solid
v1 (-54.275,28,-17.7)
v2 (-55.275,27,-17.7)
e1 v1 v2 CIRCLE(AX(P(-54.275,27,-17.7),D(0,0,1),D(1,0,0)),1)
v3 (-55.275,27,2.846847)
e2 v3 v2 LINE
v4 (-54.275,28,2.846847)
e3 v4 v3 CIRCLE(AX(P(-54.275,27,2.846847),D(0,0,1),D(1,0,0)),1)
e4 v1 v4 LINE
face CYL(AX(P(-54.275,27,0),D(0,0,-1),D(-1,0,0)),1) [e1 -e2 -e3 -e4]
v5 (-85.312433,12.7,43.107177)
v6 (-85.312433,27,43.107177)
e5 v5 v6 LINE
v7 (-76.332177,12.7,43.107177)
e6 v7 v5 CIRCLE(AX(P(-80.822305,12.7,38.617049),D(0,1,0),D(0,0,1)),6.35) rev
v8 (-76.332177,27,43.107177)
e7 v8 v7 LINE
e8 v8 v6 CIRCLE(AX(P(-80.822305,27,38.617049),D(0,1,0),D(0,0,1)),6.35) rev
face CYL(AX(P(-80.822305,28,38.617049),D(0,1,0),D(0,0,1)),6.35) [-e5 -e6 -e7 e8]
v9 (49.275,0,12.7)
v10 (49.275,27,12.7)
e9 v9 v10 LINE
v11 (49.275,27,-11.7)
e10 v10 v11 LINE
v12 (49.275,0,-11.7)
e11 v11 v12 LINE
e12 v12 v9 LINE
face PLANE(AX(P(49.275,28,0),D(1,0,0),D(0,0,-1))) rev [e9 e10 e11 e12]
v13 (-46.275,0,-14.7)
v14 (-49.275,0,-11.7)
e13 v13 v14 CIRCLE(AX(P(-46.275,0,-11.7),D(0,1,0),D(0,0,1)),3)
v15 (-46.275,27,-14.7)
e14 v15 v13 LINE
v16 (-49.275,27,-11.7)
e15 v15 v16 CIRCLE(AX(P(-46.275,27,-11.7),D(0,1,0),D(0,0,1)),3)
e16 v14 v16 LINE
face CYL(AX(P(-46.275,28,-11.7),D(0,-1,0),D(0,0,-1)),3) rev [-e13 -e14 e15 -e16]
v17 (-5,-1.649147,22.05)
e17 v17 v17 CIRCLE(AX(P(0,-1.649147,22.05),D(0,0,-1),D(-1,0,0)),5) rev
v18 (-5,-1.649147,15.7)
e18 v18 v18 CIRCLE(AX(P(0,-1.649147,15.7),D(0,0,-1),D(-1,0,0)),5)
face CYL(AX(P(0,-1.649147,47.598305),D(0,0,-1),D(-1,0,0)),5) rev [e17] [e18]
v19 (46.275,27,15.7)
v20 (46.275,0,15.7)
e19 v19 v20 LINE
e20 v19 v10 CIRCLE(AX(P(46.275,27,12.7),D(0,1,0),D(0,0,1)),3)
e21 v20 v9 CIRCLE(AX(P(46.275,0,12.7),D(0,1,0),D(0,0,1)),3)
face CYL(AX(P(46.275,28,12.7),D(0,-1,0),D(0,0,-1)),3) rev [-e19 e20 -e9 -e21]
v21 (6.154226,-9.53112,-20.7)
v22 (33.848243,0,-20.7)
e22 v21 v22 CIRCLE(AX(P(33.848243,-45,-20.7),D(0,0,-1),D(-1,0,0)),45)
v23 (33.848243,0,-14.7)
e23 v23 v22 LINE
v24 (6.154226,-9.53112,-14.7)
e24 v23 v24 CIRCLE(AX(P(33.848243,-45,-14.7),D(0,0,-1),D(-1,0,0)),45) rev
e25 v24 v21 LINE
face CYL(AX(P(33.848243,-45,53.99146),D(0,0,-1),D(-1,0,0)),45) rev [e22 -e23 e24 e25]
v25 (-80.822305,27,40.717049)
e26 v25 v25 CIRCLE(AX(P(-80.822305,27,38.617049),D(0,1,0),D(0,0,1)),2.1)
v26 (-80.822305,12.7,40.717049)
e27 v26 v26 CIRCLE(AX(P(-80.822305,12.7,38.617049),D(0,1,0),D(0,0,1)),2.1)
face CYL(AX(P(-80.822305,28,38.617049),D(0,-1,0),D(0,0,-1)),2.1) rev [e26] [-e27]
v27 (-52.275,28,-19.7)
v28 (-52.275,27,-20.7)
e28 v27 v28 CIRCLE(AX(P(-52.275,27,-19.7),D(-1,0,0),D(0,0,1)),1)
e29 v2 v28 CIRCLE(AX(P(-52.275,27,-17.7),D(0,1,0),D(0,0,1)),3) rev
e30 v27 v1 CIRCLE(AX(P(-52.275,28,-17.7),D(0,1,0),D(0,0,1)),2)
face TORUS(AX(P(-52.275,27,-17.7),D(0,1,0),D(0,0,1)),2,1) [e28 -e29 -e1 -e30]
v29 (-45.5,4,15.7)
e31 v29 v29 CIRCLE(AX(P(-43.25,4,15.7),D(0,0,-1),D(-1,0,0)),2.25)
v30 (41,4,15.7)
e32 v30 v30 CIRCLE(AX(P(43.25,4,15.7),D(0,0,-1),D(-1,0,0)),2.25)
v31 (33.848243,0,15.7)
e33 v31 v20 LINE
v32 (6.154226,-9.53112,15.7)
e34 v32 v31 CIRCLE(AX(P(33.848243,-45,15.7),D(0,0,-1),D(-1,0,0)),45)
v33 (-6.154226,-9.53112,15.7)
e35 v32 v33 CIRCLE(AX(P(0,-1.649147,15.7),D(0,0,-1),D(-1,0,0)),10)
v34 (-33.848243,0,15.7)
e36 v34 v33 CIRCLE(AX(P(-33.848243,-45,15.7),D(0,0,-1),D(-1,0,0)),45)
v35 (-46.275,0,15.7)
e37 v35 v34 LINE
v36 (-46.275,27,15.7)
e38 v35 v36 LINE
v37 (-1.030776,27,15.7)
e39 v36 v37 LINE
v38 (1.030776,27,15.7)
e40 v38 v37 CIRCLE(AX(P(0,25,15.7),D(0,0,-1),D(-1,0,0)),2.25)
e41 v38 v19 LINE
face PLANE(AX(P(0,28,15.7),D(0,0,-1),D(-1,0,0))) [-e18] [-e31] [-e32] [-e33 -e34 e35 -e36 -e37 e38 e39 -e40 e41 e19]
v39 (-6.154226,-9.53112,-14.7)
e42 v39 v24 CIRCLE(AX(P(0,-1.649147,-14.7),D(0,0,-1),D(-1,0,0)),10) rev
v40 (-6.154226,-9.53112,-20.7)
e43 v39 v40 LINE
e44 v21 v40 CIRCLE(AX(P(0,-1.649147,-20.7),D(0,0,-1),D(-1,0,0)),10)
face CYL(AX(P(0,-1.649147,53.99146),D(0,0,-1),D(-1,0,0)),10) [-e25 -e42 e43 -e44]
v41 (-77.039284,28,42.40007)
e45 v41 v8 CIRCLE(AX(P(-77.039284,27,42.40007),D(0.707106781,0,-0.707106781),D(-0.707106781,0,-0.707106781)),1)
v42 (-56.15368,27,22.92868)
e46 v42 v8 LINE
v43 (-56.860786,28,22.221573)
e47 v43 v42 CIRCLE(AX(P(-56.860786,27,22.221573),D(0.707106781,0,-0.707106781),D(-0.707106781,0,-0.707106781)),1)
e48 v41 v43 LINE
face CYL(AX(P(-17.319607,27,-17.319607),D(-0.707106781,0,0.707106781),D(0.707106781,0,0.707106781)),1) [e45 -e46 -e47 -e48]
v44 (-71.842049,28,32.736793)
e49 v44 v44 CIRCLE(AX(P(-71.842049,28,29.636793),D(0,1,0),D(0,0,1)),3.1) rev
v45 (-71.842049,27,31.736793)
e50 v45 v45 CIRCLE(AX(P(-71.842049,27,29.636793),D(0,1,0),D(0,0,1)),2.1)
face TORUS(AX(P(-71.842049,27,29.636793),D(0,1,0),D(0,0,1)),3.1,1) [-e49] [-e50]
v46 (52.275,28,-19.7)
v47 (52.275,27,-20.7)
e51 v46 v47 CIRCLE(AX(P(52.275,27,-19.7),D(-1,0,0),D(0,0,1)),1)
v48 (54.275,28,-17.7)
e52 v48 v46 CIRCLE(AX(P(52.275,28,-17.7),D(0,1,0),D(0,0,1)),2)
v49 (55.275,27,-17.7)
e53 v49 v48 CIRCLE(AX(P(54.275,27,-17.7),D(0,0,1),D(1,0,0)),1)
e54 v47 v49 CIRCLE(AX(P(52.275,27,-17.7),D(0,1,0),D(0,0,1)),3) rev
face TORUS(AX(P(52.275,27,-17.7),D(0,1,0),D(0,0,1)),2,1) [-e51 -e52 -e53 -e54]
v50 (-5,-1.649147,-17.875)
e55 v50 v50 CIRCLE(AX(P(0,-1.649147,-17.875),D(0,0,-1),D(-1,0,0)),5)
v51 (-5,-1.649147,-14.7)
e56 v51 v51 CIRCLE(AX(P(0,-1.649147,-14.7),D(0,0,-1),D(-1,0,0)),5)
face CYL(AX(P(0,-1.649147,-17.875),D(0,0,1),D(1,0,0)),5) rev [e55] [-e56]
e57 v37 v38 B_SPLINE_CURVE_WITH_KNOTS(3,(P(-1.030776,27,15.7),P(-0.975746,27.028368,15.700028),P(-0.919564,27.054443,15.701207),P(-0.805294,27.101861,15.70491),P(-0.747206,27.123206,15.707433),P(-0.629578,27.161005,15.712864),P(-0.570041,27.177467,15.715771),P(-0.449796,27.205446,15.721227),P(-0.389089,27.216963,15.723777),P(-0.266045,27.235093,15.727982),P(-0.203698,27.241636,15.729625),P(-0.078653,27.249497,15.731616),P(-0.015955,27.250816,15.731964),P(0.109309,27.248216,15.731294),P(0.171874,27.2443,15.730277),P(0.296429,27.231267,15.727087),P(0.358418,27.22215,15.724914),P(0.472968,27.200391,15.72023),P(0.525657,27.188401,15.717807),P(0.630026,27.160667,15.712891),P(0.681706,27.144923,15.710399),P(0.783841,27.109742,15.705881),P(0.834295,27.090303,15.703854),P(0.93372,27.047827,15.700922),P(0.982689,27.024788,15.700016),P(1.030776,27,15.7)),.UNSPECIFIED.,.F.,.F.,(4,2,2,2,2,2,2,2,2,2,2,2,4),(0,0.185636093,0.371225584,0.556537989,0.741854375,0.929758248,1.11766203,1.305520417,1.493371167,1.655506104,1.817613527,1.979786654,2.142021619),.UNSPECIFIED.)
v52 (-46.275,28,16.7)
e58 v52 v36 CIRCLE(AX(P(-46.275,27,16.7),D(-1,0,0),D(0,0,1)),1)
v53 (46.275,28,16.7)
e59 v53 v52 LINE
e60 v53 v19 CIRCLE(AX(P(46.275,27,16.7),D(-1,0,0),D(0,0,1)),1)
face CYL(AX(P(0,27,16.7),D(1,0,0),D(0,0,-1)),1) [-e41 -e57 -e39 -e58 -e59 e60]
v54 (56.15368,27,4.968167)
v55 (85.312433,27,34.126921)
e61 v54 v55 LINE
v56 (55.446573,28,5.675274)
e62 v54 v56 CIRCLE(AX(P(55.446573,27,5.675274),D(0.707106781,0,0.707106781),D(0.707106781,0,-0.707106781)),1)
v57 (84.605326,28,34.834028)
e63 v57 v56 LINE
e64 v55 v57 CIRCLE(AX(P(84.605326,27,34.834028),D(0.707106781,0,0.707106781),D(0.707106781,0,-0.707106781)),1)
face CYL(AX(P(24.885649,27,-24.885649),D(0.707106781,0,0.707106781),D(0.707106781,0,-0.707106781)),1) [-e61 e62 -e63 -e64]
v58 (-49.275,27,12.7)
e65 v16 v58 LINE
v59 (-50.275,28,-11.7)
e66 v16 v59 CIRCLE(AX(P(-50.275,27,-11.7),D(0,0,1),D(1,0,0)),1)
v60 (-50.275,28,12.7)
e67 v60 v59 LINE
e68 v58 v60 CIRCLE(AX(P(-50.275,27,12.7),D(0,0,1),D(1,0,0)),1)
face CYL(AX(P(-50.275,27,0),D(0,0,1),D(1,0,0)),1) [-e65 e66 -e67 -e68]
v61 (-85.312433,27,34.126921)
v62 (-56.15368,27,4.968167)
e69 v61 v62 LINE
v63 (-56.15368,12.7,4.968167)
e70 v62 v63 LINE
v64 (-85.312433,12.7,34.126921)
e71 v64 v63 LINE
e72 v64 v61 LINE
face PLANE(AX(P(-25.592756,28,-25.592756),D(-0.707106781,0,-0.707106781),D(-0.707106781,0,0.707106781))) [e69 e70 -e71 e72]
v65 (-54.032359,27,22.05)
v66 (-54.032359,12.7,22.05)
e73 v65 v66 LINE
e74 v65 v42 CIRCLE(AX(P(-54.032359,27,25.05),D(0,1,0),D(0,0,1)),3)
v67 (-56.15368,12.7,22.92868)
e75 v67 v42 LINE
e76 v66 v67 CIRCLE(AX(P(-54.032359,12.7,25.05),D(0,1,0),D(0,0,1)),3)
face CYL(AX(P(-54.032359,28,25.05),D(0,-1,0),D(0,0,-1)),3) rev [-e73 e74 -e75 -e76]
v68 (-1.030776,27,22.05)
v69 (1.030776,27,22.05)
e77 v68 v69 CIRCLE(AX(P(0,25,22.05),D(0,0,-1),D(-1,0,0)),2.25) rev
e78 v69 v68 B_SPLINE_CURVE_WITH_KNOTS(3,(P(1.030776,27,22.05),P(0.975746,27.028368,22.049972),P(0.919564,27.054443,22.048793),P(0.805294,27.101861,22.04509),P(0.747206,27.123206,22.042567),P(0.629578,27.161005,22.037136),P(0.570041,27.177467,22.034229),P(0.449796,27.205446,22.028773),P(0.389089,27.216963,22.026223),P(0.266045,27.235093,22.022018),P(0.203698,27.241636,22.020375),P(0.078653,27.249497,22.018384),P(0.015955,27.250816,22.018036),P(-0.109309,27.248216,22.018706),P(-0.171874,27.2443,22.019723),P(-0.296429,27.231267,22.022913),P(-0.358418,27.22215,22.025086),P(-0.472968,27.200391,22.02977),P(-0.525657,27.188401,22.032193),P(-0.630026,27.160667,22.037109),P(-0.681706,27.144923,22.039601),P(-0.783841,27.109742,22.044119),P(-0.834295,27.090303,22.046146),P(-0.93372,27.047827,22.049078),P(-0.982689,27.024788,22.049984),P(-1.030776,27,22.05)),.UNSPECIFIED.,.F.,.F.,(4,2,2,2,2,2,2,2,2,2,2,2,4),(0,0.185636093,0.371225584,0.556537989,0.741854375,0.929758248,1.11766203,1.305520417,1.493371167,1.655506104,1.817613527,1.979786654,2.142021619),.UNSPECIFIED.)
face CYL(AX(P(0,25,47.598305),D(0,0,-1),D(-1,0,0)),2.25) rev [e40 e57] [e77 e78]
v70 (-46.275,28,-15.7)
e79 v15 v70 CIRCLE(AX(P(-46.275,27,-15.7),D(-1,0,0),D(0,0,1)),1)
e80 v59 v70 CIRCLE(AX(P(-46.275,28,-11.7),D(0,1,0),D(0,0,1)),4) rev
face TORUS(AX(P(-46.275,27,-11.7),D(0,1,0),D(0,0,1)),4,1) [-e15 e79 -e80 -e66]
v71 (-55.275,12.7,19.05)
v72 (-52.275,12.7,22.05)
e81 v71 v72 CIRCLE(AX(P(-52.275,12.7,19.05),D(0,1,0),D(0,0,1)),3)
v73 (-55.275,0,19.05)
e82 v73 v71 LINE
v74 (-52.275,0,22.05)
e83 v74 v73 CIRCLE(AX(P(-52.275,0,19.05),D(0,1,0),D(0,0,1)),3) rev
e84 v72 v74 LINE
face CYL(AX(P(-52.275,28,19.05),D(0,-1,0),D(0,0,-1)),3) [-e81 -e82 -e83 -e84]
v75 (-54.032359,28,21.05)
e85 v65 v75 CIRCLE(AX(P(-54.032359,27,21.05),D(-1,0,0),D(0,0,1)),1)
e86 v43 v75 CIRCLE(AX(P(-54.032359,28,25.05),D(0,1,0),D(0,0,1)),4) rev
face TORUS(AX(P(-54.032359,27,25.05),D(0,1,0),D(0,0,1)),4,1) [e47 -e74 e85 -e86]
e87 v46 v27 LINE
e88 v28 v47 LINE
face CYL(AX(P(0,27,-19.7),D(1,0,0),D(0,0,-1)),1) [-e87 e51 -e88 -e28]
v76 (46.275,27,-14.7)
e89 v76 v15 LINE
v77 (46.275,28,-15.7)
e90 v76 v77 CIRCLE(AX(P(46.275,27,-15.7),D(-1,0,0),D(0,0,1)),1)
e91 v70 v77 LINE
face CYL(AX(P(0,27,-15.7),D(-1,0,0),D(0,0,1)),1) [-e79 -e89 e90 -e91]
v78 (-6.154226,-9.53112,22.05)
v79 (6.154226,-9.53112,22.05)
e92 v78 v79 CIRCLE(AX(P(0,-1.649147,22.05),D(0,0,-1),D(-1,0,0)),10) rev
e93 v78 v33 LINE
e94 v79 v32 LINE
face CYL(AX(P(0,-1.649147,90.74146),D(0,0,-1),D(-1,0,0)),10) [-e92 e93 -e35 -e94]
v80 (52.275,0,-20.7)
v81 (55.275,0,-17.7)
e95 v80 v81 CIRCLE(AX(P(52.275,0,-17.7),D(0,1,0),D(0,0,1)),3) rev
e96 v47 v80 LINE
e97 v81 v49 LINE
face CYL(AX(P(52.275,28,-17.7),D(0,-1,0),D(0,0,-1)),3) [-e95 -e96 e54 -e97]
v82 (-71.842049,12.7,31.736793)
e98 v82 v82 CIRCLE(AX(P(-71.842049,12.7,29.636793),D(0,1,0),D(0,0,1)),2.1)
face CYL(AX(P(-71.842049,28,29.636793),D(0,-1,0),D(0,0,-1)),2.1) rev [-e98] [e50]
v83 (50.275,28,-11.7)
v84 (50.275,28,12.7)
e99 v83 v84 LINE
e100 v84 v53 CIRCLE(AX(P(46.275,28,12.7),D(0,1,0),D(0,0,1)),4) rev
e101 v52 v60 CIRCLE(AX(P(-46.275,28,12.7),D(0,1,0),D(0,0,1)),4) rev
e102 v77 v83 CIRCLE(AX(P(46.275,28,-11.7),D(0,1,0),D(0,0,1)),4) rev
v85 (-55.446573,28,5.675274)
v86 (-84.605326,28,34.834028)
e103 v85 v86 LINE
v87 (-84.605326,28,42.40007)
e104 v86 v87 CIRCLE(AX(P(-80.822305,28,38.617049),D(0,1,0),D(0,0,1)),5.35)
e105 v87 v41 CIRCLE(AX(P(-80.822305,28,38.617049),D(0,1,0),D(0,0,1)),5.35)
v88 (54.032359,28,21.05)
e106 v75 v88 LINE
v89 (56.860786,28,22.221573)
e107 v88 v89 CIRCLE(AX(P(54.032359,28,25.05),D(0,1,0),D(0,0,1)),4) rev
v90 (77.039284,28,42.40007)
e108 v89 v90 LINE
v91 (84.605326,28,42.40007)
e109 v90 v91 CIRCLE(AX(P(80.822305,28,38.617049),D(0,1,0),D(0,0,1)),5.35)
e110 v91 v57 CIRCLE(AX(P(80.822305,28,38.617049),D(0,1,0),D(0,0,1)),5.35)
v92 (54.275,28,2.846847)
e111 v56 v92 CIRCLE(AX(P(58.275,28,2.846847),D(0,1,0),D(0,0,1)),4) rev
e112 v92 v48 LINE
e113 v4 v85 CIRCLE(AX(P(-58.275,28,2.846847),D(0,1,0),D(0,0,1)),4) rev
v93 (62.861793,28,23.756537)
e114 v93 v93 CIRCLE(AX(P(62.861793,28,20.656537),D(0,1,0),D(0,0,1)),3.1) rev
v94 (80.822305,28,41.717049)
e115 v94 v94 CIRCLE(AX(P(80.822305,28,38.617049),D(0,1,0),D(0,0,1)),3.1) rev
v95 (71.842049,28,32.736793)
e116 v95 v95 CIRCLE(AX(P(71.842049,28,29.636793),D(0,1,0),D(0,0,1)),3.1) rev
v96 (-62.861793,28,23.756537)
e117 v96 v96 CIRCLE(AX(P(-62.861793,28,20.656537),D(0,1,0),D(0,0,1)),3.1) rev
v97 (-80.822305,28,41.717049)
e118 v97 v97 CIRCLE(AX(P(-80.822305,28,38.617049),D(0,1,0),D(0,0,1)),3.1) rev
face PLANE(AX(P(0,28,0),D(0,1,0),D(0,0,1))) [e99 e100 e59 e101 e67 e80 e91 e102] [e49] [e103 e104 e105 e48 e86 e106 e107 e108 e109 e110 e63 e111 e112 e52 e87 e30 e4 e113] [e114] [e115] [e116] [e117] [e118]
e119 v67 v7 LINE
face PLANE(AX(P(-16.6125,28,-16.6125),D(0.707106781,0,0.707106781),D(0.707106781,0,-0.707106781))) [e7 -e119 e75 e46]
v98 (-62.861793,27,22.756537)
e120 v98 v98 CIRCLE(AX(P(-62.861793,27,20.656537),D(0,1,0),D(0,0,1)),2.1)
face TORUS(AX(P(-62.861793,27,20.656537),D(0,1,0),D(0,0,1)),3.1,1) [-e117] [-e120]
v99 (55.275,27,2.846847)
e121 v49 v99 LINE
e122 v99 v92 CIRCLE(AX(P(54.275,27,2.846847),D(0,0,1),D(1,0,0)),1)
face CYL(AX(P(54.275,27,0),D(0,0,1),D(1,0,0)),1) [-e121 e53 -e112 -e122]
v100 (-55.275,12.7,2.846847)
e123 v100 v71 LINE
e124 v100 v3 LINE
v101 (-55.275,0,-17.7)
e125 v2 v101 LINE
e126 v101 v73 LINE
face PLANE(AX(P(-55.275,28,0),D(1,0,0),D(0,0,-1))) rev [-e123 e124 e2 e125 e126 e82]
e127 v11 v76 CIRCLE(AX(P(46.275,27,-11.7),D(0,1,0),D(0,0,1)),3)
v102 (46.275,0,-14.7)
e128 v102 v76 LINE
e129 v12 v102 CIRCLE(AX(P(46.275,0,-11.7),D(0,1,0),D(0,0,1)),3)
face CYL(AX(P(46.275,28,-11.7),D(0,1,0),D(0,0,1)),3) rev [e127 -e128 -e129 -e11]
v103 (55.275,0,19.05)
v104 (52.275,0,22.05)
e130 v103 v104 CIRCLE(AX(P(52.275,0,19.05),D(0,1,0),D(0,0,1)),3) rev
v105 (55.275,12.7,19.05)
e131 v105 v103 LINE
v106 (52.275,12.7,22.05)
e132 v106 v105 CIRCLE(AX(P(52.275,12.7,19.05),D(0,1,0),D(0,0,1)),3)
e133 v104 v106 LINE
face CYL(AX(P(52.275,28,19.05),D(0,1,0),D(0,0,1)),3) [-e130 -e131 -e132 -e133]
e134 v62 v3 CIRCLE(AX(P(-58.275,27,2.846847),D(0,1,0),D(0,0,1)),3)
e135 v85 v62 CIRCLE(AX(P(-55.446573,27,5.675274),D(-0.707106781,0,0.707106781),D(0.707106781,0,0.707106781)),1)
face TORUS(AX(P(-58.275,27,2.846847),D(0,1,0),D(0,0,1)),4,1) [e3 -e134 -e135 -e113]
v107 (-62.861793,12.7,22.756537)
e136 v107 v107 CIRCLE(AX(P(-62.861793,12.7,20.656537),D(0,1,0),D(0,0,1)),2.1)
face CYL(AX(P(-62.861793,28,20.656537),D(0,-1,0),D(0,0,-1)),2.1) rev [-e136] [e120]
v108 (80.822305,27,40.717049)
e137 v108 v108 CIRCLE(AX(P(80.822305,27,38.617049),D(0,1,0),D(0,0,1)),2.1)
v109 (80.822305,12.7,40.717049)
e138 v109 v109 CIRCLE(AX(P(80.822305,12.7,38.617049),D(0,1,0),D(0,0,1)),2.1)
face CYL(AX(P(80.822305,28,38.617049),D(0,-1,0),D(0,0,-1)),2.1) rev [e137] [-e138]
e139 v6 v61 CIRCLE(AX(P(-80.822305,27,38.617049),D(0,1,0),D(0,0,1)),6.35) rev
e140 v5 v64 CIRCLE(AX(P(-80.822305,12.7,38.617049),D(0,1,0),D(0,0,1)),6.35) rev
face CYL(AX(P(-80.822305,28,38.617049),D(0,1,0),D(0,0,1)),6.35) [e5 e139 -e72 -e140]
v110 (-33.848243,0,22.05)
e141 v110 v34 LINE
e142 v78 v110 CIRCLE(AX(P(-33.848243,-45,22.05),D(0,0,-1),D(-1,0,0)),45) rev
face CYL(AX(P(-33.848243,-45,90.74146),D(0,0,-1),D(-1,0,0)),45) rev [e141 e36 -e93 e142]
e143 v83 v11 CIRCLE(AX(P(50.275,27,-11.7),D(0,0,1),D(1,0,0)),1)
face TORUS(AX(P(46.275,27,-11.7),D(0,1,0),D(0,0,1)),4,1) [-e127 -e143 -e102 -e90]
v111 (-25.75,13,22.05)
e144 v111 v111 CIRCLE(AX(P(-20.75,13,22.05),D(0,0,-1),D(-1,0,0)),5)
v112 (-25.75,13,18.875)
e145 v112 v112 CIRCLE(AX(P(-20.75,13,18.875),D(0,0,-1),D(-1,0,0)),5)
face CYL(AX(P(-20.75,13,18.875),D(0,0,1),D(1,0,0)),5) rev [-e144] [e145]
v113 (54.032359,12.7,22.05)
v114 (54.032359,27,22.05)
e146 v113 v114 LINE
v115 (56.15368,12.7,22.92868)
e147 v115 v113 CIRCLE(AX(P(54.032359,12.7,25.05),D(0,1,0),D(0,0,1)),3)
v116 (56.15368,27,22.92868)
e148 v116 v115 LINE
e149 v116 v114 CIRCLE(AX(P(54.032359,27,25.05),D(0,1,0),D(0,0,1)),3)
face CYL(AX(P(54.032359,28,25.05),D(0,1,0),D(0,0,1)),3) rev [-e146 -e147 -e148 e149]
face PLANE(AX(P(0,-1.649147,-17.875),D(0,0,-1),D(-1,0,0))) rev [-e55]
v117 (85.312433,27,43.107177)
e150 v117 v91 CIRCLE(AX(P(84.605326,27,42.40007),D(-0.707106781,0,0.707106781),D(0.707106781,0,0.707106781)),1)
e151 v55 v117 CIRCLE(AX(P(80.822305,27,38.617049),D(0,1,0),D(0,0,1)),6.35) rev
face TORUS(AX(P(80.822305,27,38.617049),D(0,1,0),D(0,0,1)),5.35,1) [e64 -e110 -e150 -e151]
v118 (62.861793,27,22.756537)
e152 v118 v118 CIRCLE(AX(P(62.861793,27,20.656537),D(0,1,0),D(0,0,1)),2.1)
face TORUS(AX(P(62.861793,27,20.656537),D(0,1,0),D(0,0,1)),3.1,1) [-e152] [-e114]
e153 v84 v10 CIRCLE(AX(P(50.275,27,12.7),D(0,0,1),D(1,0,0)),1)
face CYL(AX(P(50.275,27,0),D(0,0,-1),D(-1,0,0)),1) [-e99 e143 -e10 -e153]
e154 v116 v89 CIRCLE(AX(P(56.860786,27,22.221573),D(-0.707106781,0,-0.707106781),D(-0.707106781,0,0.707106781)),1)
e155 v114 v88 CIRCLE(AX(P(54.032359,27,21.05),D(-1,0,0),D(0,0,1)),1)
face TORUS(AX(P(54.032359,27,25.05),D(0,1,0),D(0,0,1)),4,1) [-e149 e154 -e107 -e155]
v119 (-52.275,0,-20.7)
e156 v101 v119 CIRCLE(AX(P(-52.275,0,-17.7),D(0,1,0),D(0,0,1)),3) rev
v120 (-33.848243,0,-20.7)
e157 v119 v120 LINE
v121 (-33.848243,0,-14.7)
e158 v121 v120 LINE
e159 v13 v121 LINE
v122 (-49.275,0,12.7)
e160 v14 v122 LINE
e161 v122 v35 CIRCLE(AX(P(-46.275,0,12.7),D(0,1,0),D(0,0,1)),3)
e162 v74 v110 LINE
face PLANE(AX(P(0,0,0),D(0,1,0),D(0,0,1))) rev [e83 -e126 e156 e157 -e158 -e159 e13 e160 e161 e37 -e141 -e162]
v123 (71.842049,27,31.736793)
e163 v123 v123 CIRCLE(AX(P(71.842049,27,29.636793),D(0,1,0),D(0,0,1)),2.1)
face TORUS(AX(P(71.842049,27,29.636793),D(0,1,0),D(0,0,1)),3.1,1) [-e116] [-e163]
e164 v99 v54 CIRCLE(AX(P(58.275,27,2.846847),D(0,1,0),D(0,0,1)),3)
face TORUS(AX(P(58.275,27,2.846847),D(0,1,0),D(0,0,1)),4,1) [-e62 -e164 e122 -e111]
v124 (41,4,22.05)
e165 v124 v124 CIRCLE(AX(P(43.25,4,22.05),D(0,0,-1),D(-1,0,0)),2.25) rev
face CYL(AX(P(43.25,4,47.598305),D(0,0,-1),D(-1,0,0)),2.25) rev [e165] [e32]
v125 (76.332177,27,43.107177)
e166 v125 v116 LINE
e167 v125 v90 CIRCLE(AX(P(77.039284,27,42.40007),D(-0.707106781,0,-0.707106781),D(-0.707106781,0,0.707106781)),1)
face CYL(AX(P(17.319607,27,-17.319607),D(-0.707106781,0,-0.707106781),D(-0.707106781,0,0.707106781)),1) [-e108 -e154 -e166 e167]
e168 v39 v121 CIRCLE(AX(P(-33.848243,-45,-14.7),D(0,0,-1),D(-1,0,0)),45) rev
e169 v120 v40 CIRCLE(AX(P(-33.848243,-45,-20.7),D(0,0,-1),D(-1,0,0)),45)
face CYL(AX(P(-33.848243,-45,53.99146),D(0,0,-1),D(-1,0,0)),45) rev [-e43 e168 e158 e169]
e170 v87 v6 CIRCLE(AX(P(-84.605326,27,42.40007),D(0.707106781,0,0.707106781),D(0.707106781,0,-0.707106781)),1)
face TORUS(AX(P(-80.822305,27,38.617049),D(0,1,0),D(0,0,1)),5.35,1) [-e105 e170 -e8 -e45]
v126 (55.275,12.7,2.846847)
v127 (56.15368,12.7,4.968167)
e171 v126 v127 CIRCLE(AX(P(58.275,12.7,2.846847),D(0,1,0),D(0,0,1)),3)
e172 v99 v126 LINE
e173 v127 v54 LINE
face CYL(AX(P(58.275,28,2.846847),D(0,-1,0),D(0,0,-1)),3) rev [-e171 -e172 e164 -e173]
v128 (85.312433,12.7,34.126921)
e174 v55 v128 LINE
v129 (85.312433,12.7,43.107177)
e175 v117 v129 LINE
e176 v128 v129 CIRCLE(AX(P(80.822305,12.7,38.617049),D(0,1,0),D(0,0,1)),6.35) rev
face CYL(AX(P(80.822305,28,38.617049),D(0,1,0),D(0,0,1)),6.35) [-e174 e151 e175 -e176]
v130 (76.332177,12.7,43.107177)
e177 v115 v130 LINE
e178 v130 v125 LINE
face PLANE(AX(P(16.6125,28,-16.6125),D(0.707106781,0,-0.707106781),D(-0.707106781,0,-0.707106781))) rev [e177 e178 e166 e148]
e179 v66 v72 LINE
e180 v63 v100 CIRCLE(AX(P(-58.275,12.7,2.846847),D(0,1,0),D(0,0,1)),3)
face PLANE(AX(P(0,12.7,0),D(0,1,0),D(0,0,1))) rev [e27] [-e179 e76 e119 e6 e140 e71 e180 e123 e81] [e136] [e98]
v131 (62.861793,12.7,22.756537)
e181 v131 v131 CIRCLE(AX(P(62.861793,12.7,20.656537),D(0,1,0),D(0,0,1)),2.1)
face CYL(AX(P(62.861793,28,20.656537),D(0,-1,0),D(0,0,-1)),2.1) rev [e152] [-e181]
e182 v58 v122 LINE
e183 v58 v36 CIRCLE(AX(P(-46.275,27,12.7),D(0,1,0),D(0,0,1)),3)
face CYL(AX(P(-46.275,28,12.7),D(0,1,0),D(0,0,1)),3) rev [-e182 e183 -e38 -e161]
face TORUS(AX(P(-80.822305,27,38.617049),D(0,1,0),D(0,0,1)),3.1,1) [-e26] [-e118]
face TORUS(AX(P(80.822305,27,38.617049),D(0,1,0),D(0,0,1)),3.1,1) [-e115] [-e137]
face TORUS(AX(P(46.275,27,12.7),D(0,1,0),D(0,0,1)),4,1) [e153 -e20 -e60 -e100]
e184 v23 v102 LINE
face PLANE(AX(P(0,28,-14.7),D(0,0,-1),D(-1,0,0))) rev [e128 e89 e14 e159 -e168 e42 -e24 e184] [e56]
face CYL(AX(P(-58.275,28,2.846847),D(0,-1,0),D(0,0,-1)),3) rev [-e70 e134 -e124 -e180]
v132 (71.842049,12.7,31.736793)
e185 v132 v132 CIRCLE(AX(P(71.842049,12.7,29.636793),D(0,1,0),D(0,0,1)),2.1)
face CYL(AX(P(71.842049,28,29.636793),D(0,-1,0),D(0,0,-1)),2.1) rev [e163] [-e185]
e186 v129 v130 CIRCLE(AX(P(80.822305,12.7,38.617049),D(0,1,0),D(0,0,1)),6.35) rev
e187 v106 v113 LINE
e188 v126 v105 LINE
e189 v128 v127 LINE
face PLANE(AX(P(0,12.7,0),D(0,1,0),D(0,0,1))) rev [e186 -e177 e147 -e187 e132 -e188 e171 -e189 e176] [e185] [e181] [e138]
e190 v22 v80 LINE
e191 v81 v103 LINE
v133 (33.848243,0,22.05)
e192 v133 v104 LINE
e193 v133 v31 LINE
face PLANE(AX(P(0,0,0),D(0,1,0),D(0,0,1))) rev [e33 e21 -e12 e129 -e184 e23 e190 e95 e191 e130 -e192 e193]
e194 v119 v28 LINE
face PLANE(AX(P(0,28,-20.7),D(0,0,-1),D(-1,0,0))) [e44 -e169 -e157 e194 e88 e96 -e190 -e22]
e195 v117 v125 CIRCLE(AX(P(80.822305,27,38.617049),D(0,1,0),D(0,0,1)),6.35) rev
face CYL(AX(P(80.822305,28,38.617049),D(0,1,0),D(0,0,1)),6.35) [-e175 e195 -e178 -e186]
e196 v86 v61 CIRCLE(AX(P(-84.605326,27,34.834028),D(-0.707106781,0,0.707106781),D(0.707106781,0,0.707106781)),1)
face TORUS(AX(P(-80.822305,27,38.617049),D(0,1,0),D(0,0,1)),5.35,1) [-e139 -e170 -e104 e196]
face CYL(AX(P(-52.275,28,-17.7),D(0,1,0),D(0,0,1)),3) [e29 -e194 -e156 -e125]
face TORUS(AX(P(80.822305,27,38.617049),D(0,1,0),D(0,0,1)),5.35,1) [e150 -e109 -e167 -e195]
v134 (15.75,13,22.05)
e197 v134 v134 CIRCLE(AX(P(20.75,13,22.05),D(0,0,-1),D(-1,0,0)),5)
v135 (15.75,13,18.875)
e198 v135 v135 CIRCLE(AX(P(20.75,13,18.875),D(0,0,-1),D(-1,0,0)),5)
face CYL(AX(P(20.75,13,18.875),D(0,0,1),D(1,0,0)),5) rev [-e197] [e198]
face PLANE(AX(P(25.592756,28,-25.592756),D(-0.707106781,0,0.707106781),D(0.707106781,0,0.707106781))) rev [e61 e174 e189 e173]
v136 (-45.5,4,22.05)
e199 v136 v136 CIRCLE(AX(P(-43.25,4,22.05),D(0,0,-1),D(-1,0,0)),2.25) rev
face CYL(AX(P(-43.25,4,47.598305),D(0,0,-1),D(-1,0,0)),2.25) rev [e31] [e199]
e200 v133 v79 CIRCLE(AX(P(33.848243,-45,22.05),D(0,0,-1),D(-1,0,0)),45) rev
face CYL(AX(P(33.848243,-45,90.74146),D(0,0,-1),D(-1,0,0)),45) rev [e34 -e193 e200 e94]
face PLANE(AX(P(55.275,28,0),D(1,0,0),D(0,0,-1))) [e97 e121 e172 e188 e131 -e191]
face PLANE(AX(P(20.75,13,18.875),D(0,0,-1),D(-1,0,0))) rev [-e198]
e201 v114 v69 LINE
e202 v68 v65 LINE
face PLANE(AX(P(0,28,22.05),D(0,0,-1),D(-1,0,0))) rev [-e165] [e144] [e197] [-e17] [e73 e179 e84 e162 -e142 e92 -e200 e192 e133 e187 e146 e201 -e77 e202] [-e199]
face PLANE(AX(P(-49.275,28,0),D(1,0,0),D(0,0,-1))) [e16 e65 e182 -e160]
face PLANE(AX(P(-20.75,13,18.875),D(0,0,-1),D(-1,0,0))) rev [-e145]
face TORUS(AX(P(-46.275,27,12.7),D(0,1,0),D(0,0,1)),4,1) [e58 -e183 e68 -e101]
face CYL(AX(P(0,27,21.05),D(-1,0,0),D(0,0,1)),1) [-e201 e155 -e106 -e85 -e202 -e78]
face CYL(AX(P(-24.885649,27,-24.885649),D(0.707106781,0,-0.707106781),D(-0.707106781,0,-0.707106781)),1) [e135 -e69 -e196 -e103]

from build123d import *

# Parameters (mm, degrees)
SKETCH2_R           = 2.1
SKETCH2_W           = 98.55
SKETCH2_H           = 30.4
BOSS_EXTRUDE1_DEPTH = 28
CUT_EXTRUDE1_START  = -42.75
SKETCH3_R           = 2.25
CUT_EXTRUDE1_DEPTH  = 6.35
BOSS_EXTRUDE2_DEPTH = 6
BOSS_EXTRUDE3_START = -42.75
BOSS_EXTRUDE3_DEPTH = 6.35
CUT_EXTRUDE3_START  = -6
CUT_EXTRUDE3_DEPTH  = 3.175
CUT_EXTRUDE4_START  = -42.75
CUT_EXTRUDE4_DEPTH  = 6.35
FILLET2_R           = 6.35
CUT_EXTRUDE5_START  = -42.75
SKETCH4_7_R         = 5
CUT_EXTRUDE5_DEPTH  = 3.175
SKETCH2_4_R         = 2.1
CUT_EXTRUDE6_DEPTH  = 12.7
FILLET1_R           = 3
FILLET3_R           = 3
FILLET4_R           = 1


# Read off the part's stored shape, not the designer's step: Boss-Extrude3
# Some blends are built 0.0001 mm under size
with BuildPart() as part:
    # Sketch2 → Boss-Extrude1 (new body)
    with BuildSketch(Plane(origin=(0, 0, 0), x_dir=(1, 0, 0), z_dir=(0, 1, 0))):
        Polygon((-80.82230509, -47.59730509), (-55.275, -22.05), (55.275, -22.05), (80.82230509, -47.59730509), (89.802561211, -38.617048969), (55.275, -4.089487758), (55.275, 20.7), (-55.275, 20.7), (-55.275, -4.089487758), (-89.802561211, -38.617048969), align=None)
        with Locations(Location((-80.82230509, -38.617048969, 0), (0, 0, 270))):
            Circle(SKETCH2_R, mode=Mode.SUBTRACT)
        with Locations(Location((-71.842048969, -29.636792847, 0), (0, 0, 270))):
            Circle(SKETCH2_R, mode=Mode.SUBTRACT)
        with Locations(Location((-62.861792847, -20.656536726, 0), (0, 0, 270))):
            Circle(SKETCH2_R, mode=Mode.SUBTRACT)
        with Locations((0, -0.5)):
            Rectangle(SKETCH2_W, SKETCH2_H, mode=Mode.SUBTRACT)
        with Locations(Location((62.861792847, -20.656536726, 0), (0, 0, 270))):
            Circle(SKETCH2_R, mode=Mode.SUBTRACT)
        with Locations(Location((80.82230509, -38.617048969, 0), (0, 0, 270))):
            Circle(SKETCH2_R, mode=Mode.SUBTRACT)
        with Locations(Location((71.842048969, -29.636792847, 0), (0, 0, 270))):
            Circle(SKETCH2_R, mode=Mode.SUBTRACT)
    extrude(amount=BOSS_EXTRUDE1_DEPTH)

    # Sketch3 → Cut-Extrude1 (cut)
    with BuildSketch(Plane(origin=(0, 0, -20.7), x_dir=(-1, 0, 0), z_dir=(0, 0, -1)).offset(CUT_EXTRUDE1_START)):
        with Locations((-43.25, 4)):
            Circle(SKETCH3_R)
        with Locations((0, 25)):
            Circle(SKETCH3_R)
        with Locations((43.25, 4)):
            Circle(SKETCH3_R)
    extrude(amount=CUT_EXTRUDE1_DEPTH, mode=Mode.SUBTRACT)

    # Sketch4 → Boss-Extrude2 (add)
    with BuildSketch(Plane(origin=(0, 0, -20.7), x_dir=(-1, 0, 0), z_dir=(0, 0, -1))):
        with BuildLine():
            ThreePointArc((6.154225261, -9.531120561), (19.204123806, -2.449444335), (33.84824251, 0))
            Line((33.84824251, 0), (-33.848242566, 0))
            ThreePointArc((-33.848242566, 0), (-19.204124104, -2.449444233), (-6.154225714, -9.531120208))
            ThreePointArc((-6.154225714, -9.531120208), (-2.87e-07, -11.649146733), (6.154225261, -9.531120561))
        make_face()
    extrude(amount=-BOSS_EXTRUDE2_DEPTH)

    # Boss-Extrude3 outline → Boss-Extrude3 (add)
    with BuildSketch(Plane(origin=(0, 0, -20.7), x_dir=(-1, 0, 0), z_dir=(0, 0, -1)).offset(BOSS_EXTRUDE3_START)):
        with BuildLine():
            ThreePointArc((-33.84824251, 0), (-19.204124195, -2.449444201), (-6.154225911, -9.531120054))
            ThreePointArc((-6.154225911, -9.531120054), (0, -11.649146733), (6.154225911, -9.531120054))
            ThreePointArc((6.154225911, -9.531120054), (19.204124195, -2.449444201), (33.84824251, 0))
            Line((33.84824251, 0), (-33.84824251, 0))
        make_face()
    extrude(amount=BOSS_EXTRUDE3_DEPTH)

    # Sketch4<5> → Cut-Extrude3 (cut)
    with BuildSketch(Plane(origin=(0, 0, -20.7), x_dir=(-1, 0, 0), z_dir=(0, 0, -1)).offset(CUT_EXTRUDE3_START)):
        with BuildLine():
            ThreePointArc((5, -1.649146733), (4.929554458, -0.812789844), (4.720202861, 0))
            Line((4.720202861, 0), (-4.720202861, 0))
            ThreePointArc((-4.720202861, 0), (-0.836356889, -6.578701191), (5, -1.649146733))
        make_face()
        with BuildLine():
            Line((-4.720202861, 0), (4.720202861, 0))
            ThreePointArc((4.720202861, 0), (0, 3.350853267), (-4.720202861, 0))
        make_face()
    extrude(amount=CUT_EXTRUDE3_DEPTH, mode=Mode.SUBTRACT)

    # Sketch4<6> → Cut-Extrude4 (cut)
    with BuildSketch(Plane(origin=(0, 0, -20.7), x_dir=(-1, 0, 0), z_dir=(0, 0, -1)).offset(CUT_EXTRUDE4_START)):
        with BuildLine():
            ThreePointArc((5, -1.649146733), (4.929554458, -0.812789844), (4.720202861, 0))
            Line((4.720202861, 0), (-4.720202861, 0))
            ThreePointArc((-4.720202861, 0), (-0.836356889, -6.578701191), (5, -1.649146733))
        make_face()
        with BuildLine():
            Line((-4.720202861, 0), (4.720202861, 0))
            ThreePointArc((4.720202861, 0), (0, 3.350853267), (-4.720202861, 0))
        make_face()
    extrude(amount=CUT_EXTRUDE4_DEPTH, mode=Mode.SUBTRACT)

    # Fillet2
    fillet2_edges = [part.edges().sort_by_distance(p)[0] for p in [
        (89.802561211, 14, 38.617048969),
        (80.82230509, 14, 47.59730509),
        (-89.802561211, 14, 38.617048969),
        (-80.82230509, 14, 47.59730509),
    ]]
    fillet(fillet2_edges, radius=FILLET2_R - 0.0001)  # a hair under: the kernel refuses the full size

    # Sketch4<7> → Cut-Extrude5 (cut)
    with BuildSketch(Plane(origin=(0, 0, -20.7), x_dir=(-1, 0, 0), z_dir=(0, 0, -1)).offset(CUT_EXTRUDE5_START)):
        with Locations((-20.75, 13)):
            Circle(SKETCH4_7_R)
        with Locations((20.75, 13)):
            Circle(SKETCH4_7_R)
    extrude(amount=CUT_EXTRUDE5_DEPTH, mode=Mode.SUBTRACT)

    # Sketch2<4> → Cut-Extrude6 (cut)
    # profile 1 of 2: a face of its own
    with BuildSketch(Plane(origin=(0, 0, 0), x_dir=(1, 0, 0), z_dir=(0, 1, 0))):
        Polygon((-80.82230509, -47.59730509), (-55.275, -22.05), (-55.275, -4.089487758), (-89.802561211, -38.617048969), align=None)
        with Locations(Location((-80.82230509, -38.617048969, 0), (0, 0, 270))):
            Circle(SKETCH2_4_R, mode=Mode.SUBTRACT)
        with Locations(Location((-71.842048969, -29.636792847, 0), (0, 0, 270))):
            Circle(SKETCH2_4_R, mode=Mode.SUBTRACT)
        with Locations(Location((-62.861792847, -20.656536726, 0), (0, 0, 270))):
            Circle(SKETCH2_4_R, mode=Mode.SUBTRACT)
    # profile 2 of 2: a face of its own
    with BuildSketch(Plane(origin=(0, 0, 0), x_dir=(1, 0, 0), z_dir=(0, 1, 0))):
        Polygon((55.275, -4.089487758), (55.275, -22.05), (80.82230509, -47.59730509), (89.802561211, -38.617048969), align=None)
        with Locations(Location((80.82230509, -38.617048969, 0), (0, 0, 270))):
            Circle(SKETCH2_4_R, mode=Mode.SUBTRACT)
        with Locations(Location((71.842048969, -29.636792847, 0), (0, 0, 270))):
            Circle(SKETCH2_4_R, mode=Mode.SUBTRACT)
        with Locations(Location((62.861792847, -20.656536726, 0), (0, 0, 270))):
            Circle(SKETCH2_4_R, mode=Mode.SUBTRACT)
    extrude(amount=CUT_EXTRUDE6_DEPTH, mode=Mode.SUBTRACT)

    # Fillet1
    fillet1_edges = [part.edges().sort_by_distance(p)[0] for p in [
        (-55.275, 6.35, 22.05),
        (55.275, 6.35, 22.05),
        (-49.275, 14, -14.7),
        (-49.275, 14, 15.7),
        (49.275, 14, 15.7),
        (49.275, 14, -14.7),
        (-55.275, 14, -20.7),
        (55.275, 14, -20.7),
    ]]
    fillet(fillet1_edges, radius=FILLET1_R)

    # Fillet3
    fillet3_edges = [part.edges().sort_by_distance(p)[0] for p in [
        (55.275, 20.35, 4.089487758),
        (55.275, 20.35, 22.05),
        (-55.275, 20.35, 22.05),
        (-55.275, 20.35, 4.089487758),
    ]]
    fillet(fillet3_edges, radius=FILLET3_R)

    # Fillet4
    # the kernel refuses this fillet: 1 mm, written as the material it takes off along each edge
    with BuildSketch(Plane(origin=(62.861792847, 28, 20.656536726), x_dir=(0, 0, 1), z_dir=(-1, 0, 0))) as fillet4_piece_1:
        with BuildLine():
            CenterArc((2.1 + FILLET4_R, -FILLET4_R), FILLET4_R, 90, 90)
            Line((2.1 + FILLET4_R, 0), (2.1, 0))
            Line((2.1, 0), (2.1, -FILLET4_R))
        make_face()
    revolve(axis=Axis((62.861792847, 28, 20.656536726), (0, 1, 0)), mode=Mode.SUBTRACT)
    with BuildSketch(Plane(origin=(71.842048969, 28, 29.636792847), x_dir=(0, 0, 1), z_dir=(-1, 0, 0))) as fillet4_piece_2:
        with BuildLine():
            CenterArc((2.1 + FILLET4_R, -FILLET4_R), FILLET4_R, 90, 90)
            Line((2.1 + FILLET4_R, 0), (2.1, 0))
            Line((2.1, 0), (2.1, -FILLET4_R))
        make_face()
    revolve(axis=Axis((71.842048969, 28, 29.636792847), (0, 1, 0)), mode=Mode.SUBTRACT)
    with BuildSketch(Plane(origin=(85.312503861, 28, 34.126991619), x_dir=(0, -1, 0), z_dir=(-0.7071067811865543, 0, -0.7071067811865408)), Plane(origin=(-56.153679656, 28, 4.968167414), x_dir=(0, -1, 0), z_dir=(-0.707106781186541, 0, 0.707106781186554))) as fillet4_piece_3:
        with BuildLine():
            CenterArc((FILLET4_R, FILLET4_R), FILLET4_R, 180, 90)
            Line((0, FILLET4_R), (0, 0))
            Line((0, 0), (FILLET4_R, 0))
        make_face()
    extrude(amount=41.236804653, mode=Mode.SUBTRACT)
    with BuildSketch(Plane(origin=(-80.82230509, 28, 38.61719039), x_dir=(0.7071067811865542, 0, 0.7071067811865408), z_dir=(0.7071067811865408, 0, -0.7071067811865542))) as fillet4_piece_4:
        with BuildLine():
            CenterArc((6.3499 - FILLET4_R, FILLET4_R), FILLET4_R, 270, 90)
            Line((6.3499 - FILLET4_R, 0), (6.3499, 0))
            Line((6.3499, 0), (6.3499, FILLET4_R))
        make_face()
    revolve(axis=Axis((-80.82230509, 28, 38.61719039), (0, -1, 0)), revolution_arc=90, mode=Mode.SUBTRACT)
    with BuildSketch(Plane(origin=(-80.822446511, 28, 38.617048969), x_dir=(-0.7071067811864334, 0, 0.7071067811866617), z_dir=(0.7071067811866617, 0, 0.7071067811864334))) as fillet4_piece_5:
        with BuildLine():
            CenterArc((6.3499 - FILLET4_R, FILLET4_R), FILLET4_R, 270, 90)
            Line((6.3499 - FILLET4_R, 0), (6.3499, 0))
            Line((6.3499, 0), (6.3499, FILLET4_R))
        make_face()
    revolve(axis=Axis((-80.822446511, 28, 38.617048969), (0, -1, 0)), revolution_arc=90, mode=Mode.SUBTRACT)
    with BuildSketch(Plane(origin=(80.82230509, 28, 38.61719039), x_dir=(-0.7071067811865408, 0, 0.7071067811865542), z_dir=(-0.7071067811865542, 0, -0.7071067811865408))) as fillet4_piece_6:
        with BuildLine():
            CenterArc((6.3499 - FILLET4_R, -FILLET4_R), FILLET4_R, 0, 90)
            Line((6.3499 - FILLET4_R, 0), (6.3499, 0))
            Line((6.3499, 0), (6.3499, -FILLET4_R))
        make_face()
    revolve(axis=Axis((80.82230509, 28, 38.61719039), (0, 1, 0)), revolution_arc=90, mode=Mode.SUBTRACT)
    with BuildSketch(Plane(origin=(80.822446511, 28, 38.617048969), x_dir=(0.7071067811865537, 0, 0.7071067811865414), z_dir=(-0.7071067811865414, 0, 0.7071067811865537))) as fillet4_piece_7:
        with BuildLine():
            CenterArc((6.3499 - FILLET4_R, -FILLET4_R), FILLET4_R, 0, 90)
            Line((6.3499 - FILLET4_R, 0), (6.3499, 0))
            Line((6.3499, 0), (6.3499, -FILLET4_R))
        make_face()
    revolve(axis=Axis((80.822446511, 28, 38.617048969), (0, 1, 0)), revolution_arc=90, mode=Mode.SUBTRACT)
    with BuildSketch(Plane(origin=(-55.275, 28, -17.7), x_dir=(0, -1, 0), z_dir=(0, 0, 1)), Plane(origin=(55.275, 28, 2.846847071), x_dir=(0, -1, 0), z_dir=(0, 0, -1))) as fillet4_piece_8:
        with BuildLine():
            CenterArc((FILLET4_R, FILLET4_R), FILLET4_R, 180, 90)
            Line((0, FILLET4_R), (0, 0))
            Line((0, 0), (FILLET4_R, 0))
        make_face()
    extrude(amount=20.546847071, mode=Mode.SUBTRACT)
    with BuildSketch(Plane(origin=(46.275, 28, 15.7), x_dir=(0, -1, 0), z_dir=(-1, 0, 0)), Plane(origin=(-46.275, 28, -14.7), x_dir=(0, -1, 0), z_dir=(1, 0, 0))) as fillet4_piece_9:
        with BuildLine():
            CenterArc((FILLET4_R, FILLET4_R), FILLET4_R, 180, 90)
            Line((0, FILLET4_R), (0, 0))
            Line((0, 0), (FILLET4_R, 0))
        make_face()
    extrude(amount=92.55, mode=Mode.SUBTRACT)
    with BuildSketch(Plane(origin=(49.275, 28, -11.7), x_dir=(0, -1, 0), z_dir=(0, 0, 1)), Plane(origin=(-49.275, 28, 12.7), x_dir=(0, -1, 0), z_dir=(0, 0, -1))) as fillet4_piece_10:
        with BuildLine():
            CenterArc((FILLET4_R, FILLET4_R), FILLET4_R, 180, 90)
            Line((0, FILLET4_R), (0, 0))
            Line((0, 0), (FILLET4_R, 0))
        make_face()
    extrude(amount=24.4, mode=Mode.SUBTRACT)
    with BuildSketch(Plane(origin=(52.275, 28, -20.7), x_dir=(0, -1, 0), z_dir=(-1, 0, 0))) as fillet4_piece_11:
        with BuildLine():
            CenterArc((FILLET4_R, FILLET4_R), FILLET4_R, 180, 90)
            Line((0, FILLET4_R), (0, 0))
            Line((0, 0), (FILLET4_R, 0))
        make_face()
    extrude(amount=104.55, mode=Mode.SUBTRACT)
    with BuildSketch(Plane(origin=(-52.275, 28, -17.7), x_dir=(0, 0, -1), z_dir=(1, 0, 0))) as fillet4_piece_12:
        with BuildLine():
            CenterArc((3 - FILLET4_R, -FILLET4_R), FILLET4_R, 0, 90)
            Line((3 - FILLET4_R, 0), (3, 0))
            Line((3, 0), (3, -FILLET4_R))
        make_face()
    revolve(axis=Axis((-52.275, 28, -17.7), (0, 1, 0)), revolution_arc=90, mode=Mode.SUBTRACT)
    with BuildSketch(Plane(origin=(52.275, 28, -17.7), x_dir=(0, 0, -1), z_dir=(-1, 0, 0))) as fillet4_piece_13:
        with BuildLine():
            CenterArc((3 - FILLET4_R, FILLET4_R), FILLET4_R, 270, 90)
            Line((3 - FILLET4_R, 0), (3, 0))
            Line((3, 0), (3, FILLET4_R))
        make_face()
    revolve(axis=Axis((52.275, 28, -17.7), (0, -1, 0)), revolution_arc=90, mode=Mode.SUBTRACT)
    with BuildSketch(Plane(origin=(46.275, 28, 12.7), x_dir=(0, 0, 1), z_dir=(-1, 0, 0))) as fillet4_piece_14:
        with BuildLine():
            CenterArc((3 + FILLET4_R, -FILLET4_R), FILLET4_R, 90, 90)
            Line((3 + FILLET4_R, 0), (3, 0))
            Line((3, 0), (3, -FILLET4_R))
        make_face()
    revolve(axis=Axis((46.275, 28, 12.7), (0, 1, 0)), revolution_arc=90, mode=Mode.SUBTRACT)
    with BuildSketch(Plane(origin=(-46.275, 28, 12.7), x_dir=(0, 0, 1), z_dir=(1, 0, 0))) as fillet4_piece_15:
        with BuildLine():
            CenterArc((3 + FILLET4_R, FILLET4_R), FILLET4_R, 180, 90)
            Line((3 + FILLET4_R, 0), (3, 0))
            Line((3, 0), (3, FILLET4_R))
        make_face()
    revolve(axis=Axis((-46.275, 28, 12.7), (0, -1, 0)), revolution_arc=90, mode=Mode.SUBTRACT)
    with BuildSketch(Plane(origin=(46.275, 28, -11.7), x_dir=(0, 0, -1), z_dir=(-1, 0, 0))) as fillet4_piece_16:
        with BuildLine():
            CenterArc((3 + FILLET4_R, FILLET4_R), FILLET4_R, 180, 90)
            Line((3 + FILLET4_R, 0), (3, 0))
            Line((3, 0), (3, FILLET4_R))
        make_face()
    revolve(axis=Axis((46.275, 28, -11.7), (0, -1, 0)), revolution_arc=90, mode=Mode.SUBTRACT)
    with BuildSketch(Plane(origin=(-46.275, 28, -11.7), x_dir=(-1, 0, 0), z_dir=(0, 0, 1))) as fillet4_piece_17:
        with BuildLine():
            CenterArc((3 + FILLET4_R, FILLET4_R), FILLET4_R, 180, 90)
            Line((3 + FILLET4_R, 0), (3, 0))
            Line((3, 0), (3, FILLET4_R))
        make_face()
    revolve(axis=Axis((-46.275, 28, -11.7), (0, -1, 0)), revolution_arc=90, mode=Mode.SUBTRACT)
    with BuildSketch(Plane(origin=(-54.032359313, 28, 22.05), x_dir=(0, -1, 0), z_dir=(1, 0, 0))) as fillet4_piece_18:
        with BuildLine():
            CenterArc((FILLET4_R, FILLET4_R), FILLET4_R, 180, 90)
            Line((0, FILLET4_R), (0, 0))
            Line((0, 0), (FILLET4_R, 0))
        make_face()
    extrude(amount=108.064718626, mode=Mode.SUBTRACT)
    with BuildSketch(Plane(origin=(-76.33224774, 28, 43.10724774), x_dir=(0, -1, 0), z_dir=(0.7071067811865411, 0, -0.7071067811865539)), Plane(origin=(56.153679656, 28, 22.928679656), x_dir=(0, -1, 0), z_dir=(0.7071067811865539, 0, 0.7071067811865411))) as fillet4_piece_19:
        with BuildLine():
            CenterArc((FILLET4_R, FILLET4_R), FILLET4_R, 180, 90)
            Line((0, FILLET4_R), (0, 0))
            Line((0, 0), (FILLET4_R, 0))
        make_face()
    extrude(amount=28.536804653, mode=Mode.SUBTRACT)
    with BuildSketch(Plane(origin=(-58.275, 28, 2.846847071), x_dir=(1, 0, 0), z_dir=(0, 0, -1))) as fillet4_piece_20:
        with BuildLine():
            CenterArc((3 + FILLET4_R, FILLET4_R), FILLET4_R, 180, 90)
            Line((3 + FILLET4_R, 0), (3, 0))
            Line((3, 0), (3, FILLET4_R))
        make_face()
    revolve(axis=Axis((-58.275, 28, 2.846847071), (0, -1, 0)), revolution_arc=45, mode=Mode.SUBTRACT)
    with BuildSketch(Plane(origin=(-54.032359313, 28, 25.05), x_dir=(0, 0, -1), z_dir=(1, 0, 0))) as fillet4_piece_21:
        with BuildLine():
            CenterArc((3 + FILLET4_R, -FILLET4_R), FILLET4_R, 90, 90)
            Line((3, -FILLET4_R), (3, 0))
            Line((3, 0), (3 + FILLET4_R, 0))
        make_face()
    revolve(axis=Axis((-54.032359313, 28, 25.05), (0, 1, 0)), revolution_arc=45, mode=Mode.SUBTRACT)
    with BuildSketch(Plane(origin=(54.032359313, 28, 25.05), x_dir=(0, 0, -1), z_dir=(-1, 0, 0))) as fillet4_piece_22:
        with BuildLine():
            CenterArc((3 + FILLET4_R, FILLET4_R), FILLET4_R, 180, 90)
            Line((3 + FILLET4_R, 0), (3, 0))
            Line((3, 0), (3, FILLET4_R))
        make_face()
    revolve(axis=Axis((54.032359313, 28, 25.05), (0, -1, 0)), revolution_arc=45, mode=Mode.SUBTRACT)
    with BuildSketch(Plane(origin=(58.275, 28, 2.846847071), x_dir=(-1, 0, 0), z_dir=(0, 0, -1))) as fillet4_piece_23:
        with BuildLine():
            CenterArc((3 + FILLET4_R, -FILLET4_R), FILLET4_R, 90, 90)
            Line((3 + FILLET4_R, 0), (3, 0))
            Line((3, 0), (3, -FILLET4_R))
        make_face()
    revolve(axis=Axis((58.275, 28, 2.846847071), (0, 1, 0)), revolution_arc=45, mode=Mode.SUBTRACT)
    with BuildSketch(Plane(origin=(-80.82230509, 28, 38.617048969), x_dir=(0, 0, 1), z_dir=(-1, 0, 0))) as fillet4_piece_24:
        with BuildLine():
            CenterArc((2.1 + FILLET4_R, -FILLET4_R), FILLET4_R, 90, 90)
            Line((2.1, -FILLET4_R), (2.1, 0))
            Line((2.1, 0), (2.1 + FILLET4_R, 0))
        make_face()
    revolve(axis=Axis((-80.82230509, 28, 38.617048969), (0, 1, 0)), mode=Mode.SUBTRACT)
    with BuildSketch(Plane(origin=(-62.861792847, 28, 20.656536726), x_dir=(0, 0, 1), z_dir=(-1, 0, 0))) as fillet4_piece_25:
        with BuildLine():
            CenterArc((2.1 + FILLET4_R, -FILLET4_R), FILLET4_R, 90, 90)
            Line((2.1, -FILLET4_R), (2.1, 0))
            Line((2.1, 0), (2.1 + FILLET4_R, 0))
        make_face()
    revolve(axis=Axis((-62.861792847, 28, 20.656536726), (0, 1, 0)), mode=Mode.SUBTRACT)
    with BuildSketch(Plane(origin=(-71.842048969, 28, 29.636792847), x_dir=(0, 0, 1), z_dir=(-1, 0, 0))) as fillet4_piece_26:
        with BuildLine():
            CenterArc((2.1 + FILLET4_R, -FILLET4_R), FILLET4_R, 90, 90)
            Line((2.1, -FILLET4_R), (2.1, 0))
            Line((2.1, 0), (2.1 + FILLET4_R, 0))
        make_face()
    revolve(axis=Axis((-71.842048969, 28, 29.636792847), (0, 1, 0)), mode=Mode.SUBTRACT)
    with BuildSketch(Plane(origin=(80.82230509, 28, 38.617048969), x_dir=(0, 0, 1), z_dir=(-1, 0, 0))) as fillet4_piece_27:
        with BuildLine():
            CenterArc((2.1 + FILLET4_R, -FILLET4_R), FILLET4_R, 90, 90)
            Line((2.1 + FILLET4_R, 0), (2.1, 0))
            Line((2.1, 0), (2.1, -FILLET4_R))
        make_face()
    revolve(axis=Axis((80.82230509, 28, 38.617048969), (0, 1, 0)), mode=Mode.SUBTRACT)
    with BuildSketch(Plane(origin=(85.312362439, 28, 43.10724774), x_dir=(0, -1, 0), z_dir=(0.7071067811865406, 0, -0.7071067811865546)), Plane(origin=(-85.312503861, 28, 43.107106318), x_dir=(0, -1, 0), z_dir=(0.7071067811866623, 0, 0.7071067811864329))) as fillet4_piece_28:
        with BuildLine():
            CenterArc((FILLET4_R, FILLET4_R), FILLET4_R, 180, 90)
            Line((0, FILLET4_R), (0, 0))
            Line((0, 0), (FILLET4_R, 0))
        make_face()
    extrude(amount=0.0002, mode=Mode.SUBTRACT)


solid = part.part
